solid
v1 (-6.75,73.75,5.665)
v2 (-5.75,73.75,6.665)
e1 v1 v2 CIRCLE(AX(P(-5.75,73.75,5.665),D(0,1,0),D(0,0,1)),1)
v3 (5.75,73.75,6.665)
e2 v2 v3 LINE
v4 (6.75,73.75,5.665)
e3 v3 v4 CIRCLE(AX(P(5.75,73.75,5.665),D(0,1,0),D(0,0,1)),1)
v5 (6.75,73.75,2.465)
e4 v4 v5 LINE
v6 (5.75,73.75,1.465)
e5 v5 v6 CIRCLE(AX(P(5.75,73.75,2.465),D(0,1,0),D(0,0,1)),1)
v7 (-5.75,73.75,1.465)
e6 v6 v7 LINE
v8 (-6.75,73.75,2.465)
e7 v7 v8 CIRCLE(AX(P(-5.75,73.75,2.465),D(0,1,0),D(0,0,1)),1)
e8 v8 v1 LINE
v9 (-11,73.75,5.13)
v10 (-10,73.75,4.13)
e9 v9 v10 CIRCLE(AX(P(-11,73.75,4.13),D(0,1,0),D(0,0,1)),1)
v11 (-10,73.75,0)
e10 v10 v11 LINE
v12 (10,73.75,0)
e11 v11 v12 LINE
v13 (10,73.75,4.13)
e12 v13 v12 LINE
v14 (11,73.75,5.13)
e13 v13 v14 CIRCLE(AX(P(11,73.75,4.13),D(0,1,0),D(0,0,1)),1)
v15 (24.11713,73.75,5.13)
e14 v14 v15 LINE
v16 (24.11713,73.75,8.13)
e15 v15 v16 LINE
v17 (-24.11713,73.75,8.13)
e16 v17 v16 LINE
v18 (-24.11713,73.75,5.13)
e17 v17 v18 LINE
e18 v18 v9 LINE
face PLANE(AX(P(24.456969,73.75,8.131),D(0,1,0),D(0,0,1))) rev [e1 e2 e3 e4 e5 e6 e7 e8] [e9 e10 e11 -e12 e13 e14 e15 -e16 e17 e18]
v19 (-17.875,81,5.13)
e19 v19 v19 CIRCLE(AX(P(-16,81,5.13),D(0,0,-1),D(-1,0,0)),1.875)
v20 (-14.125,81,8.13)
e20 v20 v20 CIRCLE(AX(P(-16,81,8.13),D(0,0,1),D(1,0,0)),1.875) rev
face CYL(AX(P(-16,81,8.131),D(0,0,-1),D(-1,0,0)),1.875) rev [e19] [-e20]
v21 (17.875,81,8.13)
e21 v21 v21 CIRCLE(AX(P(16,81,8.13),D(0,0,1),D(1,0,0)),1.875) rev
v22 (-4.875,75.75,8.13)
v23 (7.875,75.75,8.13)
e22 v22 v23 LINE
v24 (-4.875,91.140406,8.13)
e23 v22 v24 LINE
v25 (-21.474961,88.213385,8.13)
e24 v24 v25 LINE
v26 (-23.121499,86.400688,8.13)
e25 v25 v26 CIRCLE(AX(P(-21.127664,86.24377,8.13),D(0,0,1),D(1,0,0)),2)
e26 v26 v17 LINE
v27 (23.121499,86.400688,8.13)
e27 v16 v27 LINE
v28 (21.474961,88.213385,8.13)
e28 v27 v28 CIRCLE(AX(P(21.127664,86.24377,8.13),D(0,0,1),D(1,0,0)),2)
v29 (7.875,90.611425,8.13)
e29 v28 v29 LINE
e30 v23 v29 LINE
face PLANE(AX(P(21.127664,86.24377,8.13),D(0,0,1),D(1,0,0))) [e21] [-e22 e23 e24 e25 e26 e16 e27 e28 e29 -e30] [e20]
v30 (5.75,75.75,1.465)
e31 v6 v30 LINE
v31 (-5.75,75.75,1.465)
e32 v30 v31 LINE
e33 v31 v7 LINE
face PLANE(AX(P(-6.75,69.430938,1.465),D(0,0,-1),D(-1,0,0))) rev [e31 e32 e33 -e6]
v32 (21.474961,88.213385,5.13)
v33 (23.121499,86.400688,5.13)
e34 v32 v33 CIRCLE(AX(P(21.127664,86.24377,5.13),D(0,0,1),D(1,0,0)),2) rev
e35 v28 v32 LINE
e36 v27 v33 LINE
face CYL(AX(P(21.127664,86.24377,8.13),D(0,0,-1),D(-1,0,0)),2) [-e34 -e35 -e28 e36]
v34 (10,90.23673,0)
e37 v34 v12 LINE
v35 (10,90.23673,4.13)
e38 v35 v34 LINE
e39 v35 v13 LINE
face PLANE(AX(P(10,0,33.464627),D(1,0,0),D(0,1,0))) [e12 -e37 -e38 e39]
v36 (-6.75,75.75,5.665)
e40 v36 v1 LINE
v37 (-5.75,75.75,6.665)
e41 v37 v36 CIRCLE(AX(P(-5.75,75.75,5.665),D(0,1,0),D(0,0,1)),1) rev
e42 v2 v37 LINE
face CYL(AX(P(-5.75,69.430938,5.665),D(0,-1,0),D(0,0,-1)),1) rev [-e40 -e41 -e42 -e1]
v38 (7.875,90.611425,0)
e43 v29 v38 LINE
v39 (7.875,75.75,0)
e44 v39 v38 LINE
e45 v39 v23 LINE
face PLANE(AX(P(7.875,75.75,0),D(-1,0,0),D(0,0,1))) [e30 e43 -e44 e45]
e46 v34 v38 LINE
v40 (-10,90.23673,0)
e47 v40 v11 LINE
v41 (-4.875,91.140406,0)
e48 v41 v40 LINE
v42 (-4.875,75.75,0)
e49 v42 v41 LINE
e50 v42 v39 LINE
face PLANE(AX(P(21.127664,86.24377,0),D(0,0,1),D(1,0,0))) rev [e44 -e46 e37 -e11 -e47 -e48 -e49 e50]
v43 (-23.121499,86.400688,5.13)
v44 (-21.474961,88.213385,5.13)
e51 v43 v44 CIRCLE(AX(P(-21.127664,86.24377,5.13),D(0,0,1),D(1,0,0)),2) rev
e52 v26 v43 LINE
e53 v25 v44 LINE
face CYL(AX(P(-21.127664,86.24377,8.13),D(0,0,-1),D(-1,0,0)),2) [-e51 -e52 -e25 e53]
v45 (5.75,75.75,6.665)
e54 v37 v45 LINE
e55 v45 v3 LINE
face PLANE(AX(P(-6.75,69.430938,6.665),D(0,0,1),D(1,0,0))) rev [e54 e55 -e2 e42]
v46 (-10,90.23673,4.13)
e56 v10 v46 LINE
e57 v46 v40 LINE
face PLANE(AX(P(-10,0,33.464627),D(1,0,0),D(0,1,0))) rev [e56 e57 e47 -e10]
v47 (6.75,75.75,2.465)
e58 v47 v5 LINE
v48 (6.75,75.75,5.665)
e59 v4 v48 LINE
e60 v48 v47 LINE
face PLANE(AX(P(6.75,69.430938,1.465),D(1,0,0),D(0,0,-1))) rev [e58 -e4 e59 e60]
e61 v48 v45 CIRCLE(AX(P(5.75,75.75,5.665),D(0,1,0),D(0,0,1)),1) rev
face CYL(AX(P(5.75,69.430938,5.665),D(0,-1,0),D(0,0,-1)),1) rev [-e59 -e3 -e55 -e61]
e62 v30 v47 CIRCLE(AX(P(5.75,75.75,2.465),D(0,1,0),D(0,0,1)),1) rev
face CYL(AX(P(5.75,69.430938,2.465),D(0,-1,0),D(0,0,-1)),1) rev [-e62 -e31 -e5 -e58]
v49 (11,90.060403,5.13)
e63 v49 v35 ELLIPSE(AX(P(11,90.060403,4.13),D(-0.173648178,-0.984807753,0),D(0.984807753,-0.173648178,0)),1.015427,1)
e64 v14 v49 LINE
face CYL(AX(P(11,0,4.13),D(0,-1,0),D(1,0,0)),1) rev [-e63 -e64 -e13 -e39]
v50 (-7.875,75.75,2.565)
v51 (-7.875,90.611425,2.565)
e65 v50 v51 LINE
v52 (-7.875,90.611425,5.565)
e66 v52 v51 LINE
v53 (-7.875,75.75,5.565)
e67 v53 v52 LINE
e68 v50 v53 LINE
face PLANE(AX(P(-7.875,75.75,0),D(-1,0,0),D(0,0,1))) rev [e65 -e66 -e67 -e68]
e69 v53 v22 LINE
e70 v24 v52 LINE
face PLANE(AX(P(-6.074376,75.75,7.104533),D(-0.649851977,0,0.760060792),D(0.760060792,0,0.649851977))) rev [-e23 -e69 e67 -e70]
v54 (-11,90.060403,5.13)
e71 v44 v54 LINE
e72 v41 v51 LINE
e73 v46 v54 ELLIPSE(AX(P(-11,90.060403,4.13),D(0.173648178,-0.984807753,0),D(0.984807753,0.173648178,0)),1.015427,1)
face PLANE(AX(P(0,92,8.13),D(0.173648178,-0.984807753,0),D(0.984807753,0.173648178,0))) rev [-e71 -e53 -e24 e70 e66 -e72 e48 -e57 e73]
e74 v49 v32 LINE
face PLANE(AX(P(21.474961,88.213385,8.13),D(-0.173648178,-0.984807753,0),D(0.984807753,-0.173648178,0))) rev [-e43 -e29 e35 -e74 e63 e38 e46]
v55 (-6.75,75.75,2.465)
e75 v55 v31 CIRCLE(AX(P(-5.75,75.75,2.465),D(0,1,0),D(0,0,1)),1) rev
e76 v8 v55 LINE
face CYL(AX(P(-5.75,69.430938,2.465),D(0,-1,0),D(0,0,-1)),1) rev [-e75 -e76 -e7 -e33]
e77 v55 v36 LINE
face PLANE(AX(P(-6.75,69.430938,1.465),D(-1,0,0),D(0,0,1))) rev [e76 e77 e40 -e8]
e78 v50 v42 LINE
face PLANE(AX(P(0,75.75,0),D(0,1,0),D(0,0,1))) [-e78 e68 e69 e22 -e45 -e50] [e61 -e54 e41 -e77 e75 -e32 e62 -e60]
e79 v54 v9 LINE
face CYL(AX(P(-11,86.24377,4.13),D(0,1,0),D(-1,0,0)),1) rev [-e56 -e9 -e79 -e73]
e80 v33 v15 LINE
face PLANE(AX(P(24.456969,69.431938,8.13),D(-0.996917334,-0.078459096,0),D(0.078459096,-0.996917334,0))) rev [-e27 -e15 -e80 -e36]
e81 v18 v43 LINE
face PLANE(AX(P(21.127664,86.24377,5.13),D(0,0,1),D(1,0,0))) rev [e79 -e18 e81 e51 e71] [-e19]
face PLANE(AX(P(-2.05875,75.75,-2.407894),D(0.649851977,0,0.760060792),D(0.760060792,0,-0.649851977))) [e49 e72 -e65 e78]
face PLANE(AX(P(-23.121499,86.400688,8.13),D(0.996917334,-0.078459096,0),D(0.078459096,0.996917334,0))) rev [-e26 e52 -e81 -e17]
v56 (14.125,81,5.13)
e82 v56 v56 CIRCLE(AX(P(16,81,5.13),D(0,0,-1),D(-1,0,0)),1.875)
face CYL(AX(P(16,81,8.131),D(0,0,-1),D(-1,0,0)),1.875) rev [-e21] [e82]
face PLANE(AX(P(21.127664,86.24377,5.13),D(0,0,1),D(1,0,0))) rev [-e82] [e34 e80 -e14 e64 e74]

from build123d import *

# Parameters (mm, degrees)
SKETCH1_R           = 1.5
BOSS_EXTRUDE1_DEPTH = 8.13
CUT_EXTRUDE1_DEPTH  = 16.25
CUT_EXTRUDE2_REACH  = 32.018
SKETCH3_W           = 13.5
SKETCH3_H           = 5.2
SKETCH4_R           = 1.5
CUT_EXTRUDE3_DEPTH  = 5.13
CUT_EXTRUDE4_REACH  = 96.714
SKETCH5_W           = 48.91393719
SKETCH5_H           = 4.31806182
FILLET1_R           = 1
CUT_EXTRUDE6_REACH  = 96.417
SKETCH8_R           = 1.875


with BuildPart() as part:
    # Sketch1 → Boss-Extrude1 (new body)
    with BuildSketch(Plane.XY):
        with BuildLine():
            Line((-24.456968595, 69.43193818), (24.456968595, 69.43193818))
            Line((24.456968595, 69.43193818), (23.121499045, 86.400687699))
            ThreePointArc((23.121499045, 86.400687699), (22.608100633, 87.588503122), (21.474960733, 88.213385013))
            Line((21.474960733, 88.213385013), (0, 92))
            Line((0, 92), (-21.474960733, 88.213385013))
            ThreePointArc((-21.474960733, 88.213385013), (-22.608100633, 87.588503122), (-23.121499045, 86.400687699))
            Line((-23.121499045, 86.400687699), (-24.456968595, 69.43193818))
        make_face()
        with Locations((-16, 81)):
            Circle(SKETCH1_R, mode=Mode.SUBTRACT)
        with Locations((16, 81)):
            Circle(SKETCH1_R, mode=Mode.SUBTRACT)
    extrude(amount=BOSS_EXTRUDE1_DEPTH)

    # Sketch2 → Cut-Extrude1 (cut)
    with BuildSketch(Plane(origin=(0, 92, 0), x_dir=(1, 0, 0), z_dir=(0, 1, 0))):
        Polygon((7.875, 0), (-4.875, 0), (-7.875, -2.565), (-7.875, -5.565), (-4.875, -8.13), (7.875, -8.13), align=None)
    extrude(amount=-CUT_EXTRUDE1_DEPTH, mode=Mode.SUBTRACT)

    # Sketch3 → Cut-Extrude2 (cut, up to next)
    with BuildSketch(Plane(origin=(0, 75.75, 0), x_dir=(1, 0, 0), z_dir=(0, 1, 0)), mode=Mode.PRIVATE) as cut_extrude2_sk1:
        with Locations((0, -4.065)):
            Rectangle(SKETCH3_W, SKETCH3_H)
    cut_extrude2_tool1 = extrude(cut_extrude2_sk1.sketch, amount=-CUT_EXTRUDE2_REACH, mode=Mode.PRIVATE) & part.part
    add(cut_extrude2_tool1.solids().sort_by_distance((0, 75.75, 4.065))[0], mode=Mode.SUBTRACT)

    # Sketch4 → Cut-Extrude3 (cut)
    # profile 1 of 2: a face of its own
    with BuildSketch(Plane(origin=(0, 0, 0), x_dir=(-1, 0, 0), z_dir=(0, 0, -1))):
        with BuildLine():
            Line((-10, 69.43193818), (-10, 90.236730193))
            Line((-10, 90.236730193), (-21.474960733, 88.213385013))
            ThreePointArc((-21.474960733, 88.213385013), (-22.608100633, 87.588503122), (-23.121499045, 86.400687699))
            Line((-23.121499045, 86.400687699), (-24.456968595, 69.43193818))
            Line((-24.456968595, 69.43193818), (-10, 69.43193818))
        make_face()
        with Locations(Location((-16, 81, 0), (0, 0, 180))):
            Circle(SKETCH4_R, mode=Mode.SUBTRACT)
    # profile 2 of 2: a face of its own
    with BuildSketch(Plane(origin=(0, 0, 0), x_dir=(-1, 0, 0), z_dir=(0, 0, -1))):
        with BuildLine():
            Line((10, 90.236730193), (10, 69.43193818))
            Line((10, 69.43193818), (24.456968595, 69.43193818))
            Line((24.456968595, 69.43193818), (23.121499045, 86.400687699))
            ThreePointArc((23.121499045, 86.400687699), (22.608100633, 87.588503122), (21.474960733, 88.213385013))
            Line((21.474960733, 88.213385013), (10, 90.236730193))
        make_face()
        with Locations(Location((16, 81, 0), (0, 0, 180))):
            Circle(SKETCH4_R, mode=Mode.SUBTRACT)
    extrude(amount=-CUT_EXTRUDE3_DEPTH, mode=Mode.SUBTRACT)

    # Sketch5 → Cut-Extrude4 (cut, up to next)
    with BuildSketch(Plane(origin=(0, 0, 0), x_dir=(-1, 0, 0), z_dir=(0, 0, -1)), mode=Mode.PRIVATE) as cut_extrude4_sk1:
        with Locations((0, 71.59096909)):
            Rectangle(SKETCH5_W, SKETCH5_H)
    cut_extrude4_tool1 = extrude(cut_extrude4_sk1.sketch, amount=-CUT_EXTRUDE4_REACH, mode=Mode.PRIVATE) & part.part
    add(cut_extrude4_tool1.solids().sort_by_distance((0, 71.590969, 0))[0], mode=Mode.SUBTRACT)

    # Fillet1
    # the kernel refuses this fillet: 1 mm, written as the material it adds along each edge
    with BuildSketch(Plane(origin=(-10, 92.736730193, 5.13), x_dir=(-1, 0, 0), z_dir=(0, -1, 0))) as fillet1_piece_1_section:
        with BuildLine():
            CenterArc((FILLET1_R, FILLET1_R), FILLET1_R, 180, 90)
            Line((0, FILLET1_R), (0, 0))
            Line((0, 0), (FILLET1_R, 0))
        make_face()
    fillet1_piece_1 = extrude(amount=18.986730193, mode=Mode.PRIVATE)
    fillet1_piece_1 = split(fillet1_piece_1, bisect_by=Plane(origin=(-11.632189481, 89.94893115, 4.903310521), z_dir=(0.17364817766693327, -0.9848077530122076, 0)), keep=Keep.TOP, mode=Mode.PRIVATE)
    add(fillet1_piece_1)
    with BuildSketch(Plane(origin=(6.75, 75.75, 1.465), x_dir=(0, 0, 1), z_dir=(0, -1, 0)), Plane(origin=(-6.75, 75.75, 6.665), x_dir=(0, 0, -1), z_dir=(0, -1, 0)), Plane(origin=(6.75, 75.75, 6.665), x_dir=(-1, 0, 0), z_dir=(0, -1, 0))) as fillet1_piece_2:
        with BuildLine():
            CenterArc((FILLET1_R, FILLET1_R), FILLET1_R, 180, 90)
            Line((0, FILLET1_R), (0, 0))
            Line((0, 0), (FILLET1_R, 0))
        make_face()
    extrude(amount=2)
    with BuildSketch(Plane(origin=(-6.75, 75.75, 1.465), x_dir=(0, 0, 1), z_dir=(0, -1, 0))) as fillet1_piece_3:
        with BuildLine():
            CenterArc((FILLET1_R, -FILLET1_R), FILLET1_R, 90, 90)
            Line((0, -FILLET1_R), (0, 0))
            Line((0, 0), (FILLET1_R, 0))
        make_face()
    extrude(amount=2)
    with BuildSketch(Plane(origin=(10, 73.75, 5.13), x_dir=(0, 0, -1), z_dir=(0, 1, 0))) as fillet1_piece_4_section:
        with BuildLine():
            CenterArc((FILLET1_R, -FILLET1_R), FILLET1_R, 90, 90)
            Line((0, -FILLET1_R), (0, 0))
            Line((0, 0), (FILLET1_R, 0))
        make_face()
    fillet1_piece_4 = extrude(amount=18.986730193, mode=Mode.PRIVATE)
    fillet1_piece_4 = split(fillet1_piece_4, bisect_by=Plane(origin=(11.632189481, 89.94893115, 4.903310521), z_dir=(-0.17364817766693252, -0.9848077530122077, 0)), keep=Keep.TOP, mode=Mode.PRIVATE)
    add(fillet1_piece_4)

    # Sketch8 → Cut-Extrude6 (cut, up to next)
    with BuildSketch(Plane(origin=(0, 0, 5.13), x_dir=(-1, 0, 0), z_dir=(0, 0, -1)), mode=Mode.PRIVATE) as cut_extrude6_sk1:
        with Locations((16, 81)):
            Circle(SKETCH8_R)
    cut_extrude6_tool1 = extrude(cut_extrude6_sk1.sketch, amount=-CUT_EXTRUDE6_REACH, mode=Mode.PRIVATE) & part.part
    # Sketch8 → Cut-Extrude6 (cut, up to next)
    with BuildSketch(Plane(origin=(0, 0, 5.13), x_dir=(-1, 0, 0), z_dir=(0, 0, -1)), mode=Mode.PRIVATE) as cut_extrude6_sk2:
        with Locations((-16, 81)):
            Circle(SKETCH8_R)
    cut_extrude6_tool2 = extrude(cut_extrude6_sk2.sketch, amount=-CUT_EXTRUDE6_REACH, mode=Mode.PRIVATE) & part.part
    add(cut_extrude6_tool1.solids().sort_by_distance((-16, 81, 5.13))[0], mode=Mode.SUBTRACT)
    add(cut_extrude6_tool2.solids().sort_by_distance((16, 81, 5.13))[0], mode=Mode.SUBTRACT)


solid = part.part
